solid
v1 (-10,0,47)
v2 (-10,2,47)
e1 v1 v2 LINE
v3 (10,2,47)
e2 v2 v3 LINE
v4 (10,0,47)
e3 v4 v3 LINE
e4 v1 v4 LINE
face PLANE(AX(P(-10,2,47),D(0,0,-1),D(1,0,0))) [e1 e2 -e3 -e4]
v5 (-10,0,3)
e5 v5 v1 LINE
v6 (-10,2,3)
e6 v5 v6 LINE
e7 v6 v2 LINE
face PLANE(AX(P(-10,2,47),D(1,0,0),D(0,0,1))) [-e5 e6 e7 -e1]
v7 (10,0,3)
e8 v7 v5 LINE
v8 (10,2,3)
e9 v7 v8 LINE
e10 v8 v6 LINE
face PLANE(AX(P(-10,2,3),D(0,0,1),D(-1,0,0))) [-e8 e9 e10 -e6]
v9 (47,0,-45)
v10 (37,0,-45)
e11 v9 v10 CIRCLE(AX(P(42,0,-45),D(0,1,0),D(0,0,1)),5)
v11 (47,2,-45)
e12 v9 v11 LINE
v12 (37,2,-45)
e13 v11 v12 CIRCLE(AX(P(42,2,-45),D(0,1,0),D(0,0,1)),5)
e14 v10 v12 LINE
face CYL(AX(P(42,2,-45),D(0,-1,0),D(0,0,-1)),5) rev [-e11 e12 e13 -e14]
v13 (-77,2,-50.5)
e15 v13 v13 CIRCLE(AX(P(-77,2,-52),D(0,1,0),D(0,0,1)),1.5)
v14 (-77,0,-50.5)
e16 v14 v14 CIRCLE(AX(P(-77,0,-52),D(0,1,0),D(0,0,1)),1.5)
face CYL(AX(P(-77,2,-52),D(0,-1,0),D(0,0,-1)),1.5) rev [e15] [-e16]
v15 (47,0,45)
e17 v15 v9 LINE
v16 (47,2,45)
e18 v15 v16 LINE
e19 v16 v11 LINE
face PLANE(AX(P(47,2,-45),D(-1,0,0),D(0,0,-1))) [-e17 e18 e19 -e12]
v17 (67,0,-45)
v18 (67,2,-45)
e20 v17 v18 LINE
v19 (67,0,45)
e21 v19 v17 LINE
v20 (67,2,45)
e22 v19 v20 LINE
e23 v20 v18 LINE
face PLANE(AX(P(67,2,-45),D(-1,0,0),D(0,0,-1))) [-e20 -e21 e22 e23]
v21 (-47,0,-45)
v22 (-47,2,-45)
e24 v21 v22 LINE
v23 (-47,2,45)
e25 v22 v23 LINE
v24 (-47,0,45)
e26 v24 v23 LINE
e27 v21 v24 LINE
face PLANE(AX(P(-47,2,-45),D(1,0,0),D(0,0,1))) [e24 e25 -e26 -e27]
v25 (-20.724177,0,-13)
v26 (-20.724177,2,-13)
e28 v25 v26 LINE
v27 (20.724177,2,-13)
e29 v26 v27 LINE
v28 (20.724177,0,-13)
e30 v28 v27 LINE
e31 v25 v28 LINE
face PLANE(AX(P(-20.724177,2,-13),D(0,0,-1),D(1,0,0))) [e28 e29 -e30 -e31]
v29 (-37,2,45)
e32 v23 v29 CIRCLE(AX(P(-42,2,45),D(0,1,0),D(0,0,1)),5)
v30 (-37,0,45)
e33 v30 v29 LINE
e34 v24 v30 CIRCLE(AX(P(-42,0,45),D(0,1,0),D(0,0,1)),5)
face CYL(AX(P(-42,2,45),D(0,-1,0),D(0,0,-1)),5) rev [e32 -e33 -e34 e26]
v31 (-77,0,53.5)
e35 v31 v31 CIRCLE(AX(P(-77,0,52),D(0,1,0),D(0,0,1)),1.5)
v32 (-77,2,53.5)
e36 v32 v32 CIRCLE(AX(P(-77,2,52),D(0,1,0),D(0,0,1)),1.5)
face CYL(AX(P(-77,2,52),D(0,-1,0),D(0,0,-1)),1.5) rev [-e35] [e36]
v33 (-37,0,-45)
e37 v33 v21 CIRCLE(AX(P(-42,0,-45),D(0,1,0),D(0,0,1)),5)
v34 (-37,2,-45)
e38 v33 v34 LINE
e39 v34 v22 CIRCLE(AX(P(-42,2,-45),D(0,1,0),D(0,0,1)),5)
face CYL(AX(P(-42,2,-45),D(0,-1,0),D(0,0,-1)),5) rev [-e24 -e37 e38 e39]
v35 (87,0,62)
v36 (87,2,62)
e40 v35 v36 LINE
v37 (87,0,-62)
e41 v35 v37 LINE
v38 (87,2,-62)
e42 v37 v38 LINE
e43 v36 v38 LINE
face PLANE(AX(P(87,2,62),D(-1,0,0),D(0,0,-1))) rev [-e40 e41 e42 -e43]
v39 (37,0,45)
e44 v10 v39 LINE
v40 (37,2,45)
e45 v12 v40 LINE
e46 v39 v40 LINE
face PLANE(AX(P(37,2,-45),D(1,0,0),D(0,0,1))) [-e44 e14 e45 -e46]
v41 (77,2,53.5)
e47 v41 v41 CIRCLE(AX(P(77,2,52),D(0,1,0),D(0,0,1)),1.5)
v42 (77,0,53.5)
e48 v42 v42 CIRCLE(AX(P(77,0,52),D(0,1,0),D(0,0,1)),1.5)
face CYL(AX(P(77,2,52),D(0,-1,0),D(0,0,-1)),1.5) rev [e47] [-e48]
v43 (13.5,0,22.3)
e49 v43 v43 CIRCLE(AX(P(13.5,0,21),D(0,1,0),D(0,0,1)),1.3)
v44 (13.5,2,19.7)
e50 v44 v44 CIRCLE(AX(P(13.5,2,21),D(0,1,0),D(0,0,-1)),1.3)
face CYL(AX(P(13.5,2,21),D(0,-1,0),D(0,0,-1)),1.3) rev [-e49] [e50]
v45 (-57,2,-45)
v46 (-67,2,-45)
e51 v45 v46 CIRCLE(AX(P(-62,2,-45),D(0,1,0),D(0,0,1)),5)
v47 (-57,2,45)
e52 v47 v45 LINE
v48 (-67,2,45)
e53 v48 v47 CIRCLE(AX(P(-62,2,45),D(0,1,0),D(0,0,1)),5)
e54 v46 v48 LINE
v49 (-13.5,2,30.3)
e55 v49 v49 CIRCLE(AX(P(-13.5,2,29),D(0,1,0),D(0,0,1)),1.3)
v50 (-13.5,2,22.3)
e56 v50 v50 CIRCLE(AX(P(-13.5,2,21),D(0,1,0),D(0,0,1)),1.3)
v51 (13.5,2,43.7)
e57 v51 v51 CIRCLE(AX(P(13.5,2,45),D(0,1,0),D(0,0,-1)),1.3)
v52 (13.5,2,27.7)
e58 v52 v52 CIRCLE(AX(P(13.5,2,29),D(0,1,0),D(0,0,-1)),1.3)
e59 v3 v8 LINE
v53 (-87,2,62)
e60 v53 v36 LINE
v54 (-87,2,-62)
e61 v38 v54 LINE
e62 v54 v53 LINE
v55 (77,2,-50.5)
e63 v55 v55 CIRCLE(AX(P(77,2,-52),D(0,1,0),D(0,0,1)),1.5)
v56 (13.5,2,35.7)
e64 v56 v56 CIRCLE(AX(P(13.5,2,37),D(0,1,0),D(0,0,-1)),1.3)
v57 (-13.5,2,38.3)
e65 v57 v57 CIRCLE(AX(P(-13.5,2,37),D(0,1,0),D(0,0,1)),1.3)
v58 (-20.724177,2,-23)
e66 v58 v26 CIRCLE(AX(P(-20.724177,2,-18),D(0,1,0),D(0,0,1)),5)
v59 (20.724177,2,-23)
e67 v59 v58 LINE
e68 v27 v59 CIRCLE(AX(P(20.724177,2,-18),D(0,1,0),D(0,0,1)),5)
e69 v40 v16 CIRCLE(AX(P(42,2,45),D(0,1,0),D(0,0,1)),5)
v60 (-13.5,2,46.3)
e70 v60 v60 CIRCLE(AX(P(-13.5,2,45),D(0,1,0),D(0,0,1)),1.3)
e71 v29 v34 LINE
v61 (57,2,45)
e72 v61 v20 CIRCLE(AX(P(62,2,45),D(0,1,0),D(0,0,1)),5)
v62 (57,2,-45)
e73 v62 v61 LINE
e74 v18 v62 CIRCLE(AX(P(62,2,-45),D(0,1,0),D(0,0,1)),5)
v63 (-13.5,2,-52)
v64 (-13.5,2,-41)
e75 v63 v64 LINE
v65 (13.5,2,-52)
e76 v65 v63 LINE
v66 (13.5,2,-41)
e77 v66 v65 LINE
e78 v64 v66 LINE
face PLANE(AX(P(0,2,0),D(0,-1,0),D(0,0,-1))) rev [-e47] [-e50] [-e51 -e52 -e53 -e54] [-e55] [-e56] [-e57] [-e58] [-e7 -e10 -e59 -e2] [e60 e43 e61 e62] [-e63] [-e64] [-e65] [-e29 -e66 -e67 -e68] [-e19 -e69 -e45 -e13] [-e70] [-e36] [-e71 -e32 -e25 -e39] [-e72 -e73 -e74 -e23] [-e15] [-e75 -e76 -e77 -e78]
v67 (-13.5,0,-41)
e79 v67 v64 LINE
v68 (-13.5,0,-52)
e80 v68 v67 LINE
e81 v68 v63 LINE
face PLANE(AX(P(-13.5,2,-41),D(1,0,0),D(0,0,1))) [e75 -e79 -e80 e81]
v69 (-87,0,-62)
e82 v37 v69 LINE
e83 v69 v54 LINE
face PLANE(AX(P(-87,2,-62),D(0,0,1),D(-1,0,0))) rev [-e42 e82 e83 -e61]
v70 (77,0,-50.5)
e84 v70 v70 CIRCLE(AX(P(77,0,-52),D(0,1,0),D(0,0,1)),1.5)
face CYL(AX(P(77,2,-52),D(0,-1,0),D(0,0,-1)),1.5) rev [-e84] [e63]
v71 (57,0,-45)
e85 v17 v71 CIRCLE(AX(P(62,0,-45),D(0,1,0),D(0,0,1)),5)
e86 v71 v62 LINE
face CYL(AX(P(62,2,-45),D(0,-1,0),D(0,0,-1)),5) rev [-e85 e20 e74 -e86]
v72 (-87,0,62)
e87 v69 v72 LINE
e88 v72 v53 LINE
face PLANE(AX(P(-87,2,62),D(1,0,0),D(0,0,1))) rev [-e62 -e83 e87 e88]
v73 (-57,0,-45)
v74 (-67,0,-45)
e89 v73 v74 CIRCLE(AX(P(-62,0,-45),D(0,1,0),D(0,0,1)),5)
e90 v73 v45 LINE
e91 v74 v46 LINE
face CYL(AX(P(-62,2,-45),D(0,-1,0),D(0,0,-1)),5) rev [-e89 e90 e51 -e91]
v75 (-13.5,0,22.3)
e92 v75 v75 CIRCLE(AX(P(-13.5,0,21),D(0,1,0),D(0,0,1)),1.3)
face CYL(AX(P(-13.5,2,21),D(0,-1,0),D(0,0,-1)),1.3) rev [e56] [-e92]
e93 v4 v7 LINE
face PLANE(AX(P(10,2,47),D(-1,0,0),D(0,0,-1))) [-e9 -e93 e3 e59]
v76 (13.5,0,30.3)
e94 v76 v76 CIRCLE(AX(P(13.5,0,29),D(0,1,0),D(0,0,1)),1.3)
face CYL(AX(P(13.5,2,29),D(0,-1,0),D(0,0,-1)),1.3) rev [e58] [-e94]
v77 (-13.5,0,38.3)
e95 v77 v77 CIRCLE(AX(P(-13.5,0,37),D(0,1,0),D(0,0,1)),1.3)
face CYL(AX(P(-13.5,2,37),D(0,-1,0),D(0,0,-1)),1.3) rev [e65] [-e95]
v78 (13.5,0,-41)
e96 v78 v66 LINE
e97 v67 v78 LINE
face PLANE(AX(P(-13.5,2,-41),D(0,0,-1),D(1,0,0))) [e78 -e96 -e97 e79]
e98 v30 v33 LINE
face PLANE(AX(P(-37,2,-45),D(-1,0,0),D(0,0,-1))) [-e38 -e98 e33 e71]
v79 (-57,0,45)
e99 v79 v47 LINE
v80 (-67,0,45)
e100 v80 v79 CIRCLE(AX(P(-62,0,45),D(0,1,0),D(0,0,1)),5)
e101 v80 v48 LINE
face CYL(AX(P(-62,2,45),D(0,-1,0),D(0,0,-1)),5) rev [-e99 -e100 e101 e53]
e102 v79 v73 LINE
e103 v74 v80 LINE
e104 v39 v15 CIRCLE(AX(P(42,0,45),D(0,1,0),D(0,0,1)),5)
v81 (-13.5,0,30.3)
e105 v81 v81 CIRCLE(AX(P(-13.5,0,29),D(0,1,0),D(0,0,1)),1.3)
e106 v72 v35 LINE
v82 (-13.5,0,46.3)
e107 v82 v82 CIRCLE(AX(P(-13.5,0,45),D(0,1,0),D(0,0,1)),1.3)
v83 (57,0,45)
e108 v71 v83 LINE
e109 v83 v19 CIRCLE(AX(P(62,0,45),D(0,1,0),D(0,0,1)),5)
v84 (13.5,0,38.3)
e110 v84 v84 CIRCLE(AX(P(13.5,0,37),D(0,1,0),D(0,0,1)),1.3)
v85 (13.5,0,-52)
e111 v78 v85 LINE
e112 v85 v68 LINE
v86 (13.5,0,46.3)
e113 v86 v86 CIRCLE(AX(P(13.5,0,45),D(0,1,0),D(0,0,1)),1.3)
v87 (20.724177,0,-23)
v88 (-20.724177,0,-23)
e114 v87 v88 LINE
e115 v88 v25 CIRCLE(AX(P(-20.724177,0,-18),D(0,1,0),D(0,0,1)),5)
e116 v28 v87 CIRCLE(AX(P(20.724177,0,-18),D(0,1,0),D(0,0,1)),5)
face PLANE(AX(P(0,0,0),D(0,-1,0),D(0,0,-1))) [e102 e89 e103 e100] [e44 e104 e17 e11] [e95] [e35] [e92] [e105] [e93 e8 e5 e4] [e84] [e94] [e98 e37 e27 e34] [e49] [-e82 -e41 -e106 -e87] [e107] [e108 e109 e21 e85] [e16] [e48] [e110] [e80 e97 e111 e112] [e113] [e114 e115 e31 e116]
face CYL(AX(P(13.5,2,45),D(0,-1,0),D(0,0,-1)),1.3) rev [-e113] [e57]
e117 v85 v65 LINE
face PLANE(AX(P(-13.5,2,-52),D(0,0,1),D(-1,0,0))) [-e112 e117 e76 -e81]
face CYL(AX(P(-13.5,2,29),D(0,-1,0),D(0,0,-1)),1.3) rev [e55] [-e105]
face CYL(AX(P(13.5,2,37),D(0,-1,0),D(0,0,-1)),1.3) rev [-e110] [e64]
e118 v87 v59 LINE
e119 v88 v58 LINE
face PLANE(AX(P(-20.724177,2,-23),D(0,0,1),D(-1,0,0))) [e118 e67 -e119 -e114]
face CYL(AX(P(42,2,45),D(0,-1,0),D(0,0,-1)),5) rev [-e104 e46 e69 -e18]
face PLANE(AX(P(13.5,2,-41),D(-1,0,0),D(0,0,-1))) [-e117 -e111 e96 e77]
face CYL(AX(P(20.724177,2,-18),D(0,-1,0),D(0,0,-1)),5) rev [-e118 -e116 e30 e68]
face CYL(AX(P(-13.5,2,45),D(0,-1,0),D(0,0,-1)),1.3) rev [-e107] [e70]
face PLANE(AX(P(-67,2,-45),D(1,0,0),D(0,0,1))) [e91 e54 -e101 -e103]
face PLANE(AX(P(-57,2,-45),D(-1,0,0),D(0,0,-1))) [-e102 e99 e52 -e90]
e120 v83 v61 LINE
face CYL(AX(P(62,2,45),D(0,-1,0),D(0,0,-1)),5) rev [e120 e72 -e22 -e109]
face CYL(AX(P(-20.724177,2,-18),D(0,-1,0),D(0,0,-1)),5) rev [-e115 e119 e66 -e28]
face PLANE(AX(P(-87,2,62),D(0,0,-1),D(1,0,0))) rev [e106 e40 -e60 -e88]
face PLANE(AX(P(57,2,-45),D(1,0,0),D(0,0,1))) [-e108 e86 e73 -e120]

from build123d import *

# Parameters (mm, degrees)
ESBO_O1_W                = 174
ESBO_O1_H                = 124
ESBO_O1_R                = 1.5
RESSALTO_EXTRUS_O1_DEPTH = 2
ESBO_O2_R                = 1.3
ESBO_O2_W                = 20
ESBO_O2_H                = 44
ESBO_O2_W_2              = 27
ESBO_O2_H_2              = 11
CORTE_EXTRUS_O1_DEPTH    = 2


with BuildPart() as part:
    # Esboço1 → Ressalto-extrusão1 (new body)
    with BuildSketch(Plane(origin=(0, 0, 0), x_dir=(1, 0, 0), z_dir=(0, 1, 0))):
        Rectangle(ESBO_O1_W, ESBO_O1_H)
        with Locations(Location((-77, 52, 0), (0, 0, 270))):
            Circle(ESBO_O1_R, mode=Mode.SUBTRACT)
        with Locations(Location((-77, -52, 0), (0, 0, 270))):
            Circle(ESBO_O1_R, mode=Mode.SUBTRACT)
        with Locations(Location((77, -52, 0), (0, 0, 270))):
            Circle(ESBO_O1_R, mode=Mode.SUBTRACT)
        with Locations(Location((77, 52, 0), (0, 0, 270))):
            Circle(ESBO_O1_R, mode=Mode.SUBTRACT)
    extrude(amount=RESSALTO_EXTRUS_O1_DEPTH)

    # Esboço2 → Corte-extrusão1 (cut)
    with BuildSketch(Plane(origin=(0, 2, 0), x_dir=(1, 0, 0), z_dir=(0, 1, 0))):
        with Locations(Location((-13.5, -21, 0), (0, 0, 270))):
            Circle(ESBO_O2_R)
        with Locations(Location((-13.5, -29, 0), (0, 0, 270))):
            Circle(ESBO_O2_R)
        with Locations(Location((-13.5, -37, 0), (0, 0, 270))):
            Circle(ESBO_O2_R)
        with Locations(Location((-13.5, -45, 0), (0, 0, 270))):
            Circle(ESBO_O2_R)
        with Locations(Location((13.5, -37, 0), (0, 0, 90))):
            Circle(ESBO_O2_R)
        with Locations(Location((13.5, -45, 0), (0, 0, 90))):
            Circle(ESBO_O2_R)
        with Locations(Location((13.5, -29, 0), (0, 0, 90))):
            Circle(ESBO_O2_R)
        with Locations(Location((13.5, -21, 0), (0, 0, 90))):
            Circle(ESBO_O2_R)
        with Locations((0, -25)):
            Rectangle(ESBO_O2_W, ESBO_O2_H)
        with BuildLine():
            Line((-37, 45), (-37, -45))
            ThreePointArc((-37, -45), (-42, -50), (-47, -45))
            Line((-47, -45), (-47, 45))
            ThreePointArc((-47, 45), (-42, 50), (-37, 45))
        make_face()
        with BuildLine():
            Line((-57, 45), (-57, -45))
            ThreePointArc((-57, -45), (-62, -50), (-67, -45))
            Line((-67, -45), (-67, 45))
            ThreePointArc((-67, 45), (-62, 50), (-57, 45))
        make_face()
        with BuildLine():
            Line((47, 45), (47, -45))
            ThreePointArc((47, -45), (42, -50), (37, -45))
            Line((37, -45), (37, 45))
            ThreePointArc((37, 45), (42, 50), (47, 45))
        make_face()
        with BuildLine():
            Line((67, 45), (67, -45))
            ThreePointArc((67, -45), (62, -50), (57, -45))
            Line((57, -45), (57, 45))
            ThreePointArc((57, 45), (62, 50), (67, 45))
        make_face()
        with BuildLine():
            Line((-20.724176636, 23), (20.724176636, 23))
            ThreePointArc((20.724176636, 23), (25.724176636, 18), (20.724176636, 13))
            Line((20.724176636, 13), (-20.724176636, 13))
            ThreePointArc((-20.724176636, 13), (-25.724176636, 18), (-20.724176636, 23))
        make_face()
        with Locations((0, 46.5)):
            Rectangle(ESBO_O2_W_2, ESBO_O2_H_2)
    extrude(amount=-CORTE_EXTRUS_O1_DEPTH, mode=Mode.SUBTRACT)


solid = part.part
